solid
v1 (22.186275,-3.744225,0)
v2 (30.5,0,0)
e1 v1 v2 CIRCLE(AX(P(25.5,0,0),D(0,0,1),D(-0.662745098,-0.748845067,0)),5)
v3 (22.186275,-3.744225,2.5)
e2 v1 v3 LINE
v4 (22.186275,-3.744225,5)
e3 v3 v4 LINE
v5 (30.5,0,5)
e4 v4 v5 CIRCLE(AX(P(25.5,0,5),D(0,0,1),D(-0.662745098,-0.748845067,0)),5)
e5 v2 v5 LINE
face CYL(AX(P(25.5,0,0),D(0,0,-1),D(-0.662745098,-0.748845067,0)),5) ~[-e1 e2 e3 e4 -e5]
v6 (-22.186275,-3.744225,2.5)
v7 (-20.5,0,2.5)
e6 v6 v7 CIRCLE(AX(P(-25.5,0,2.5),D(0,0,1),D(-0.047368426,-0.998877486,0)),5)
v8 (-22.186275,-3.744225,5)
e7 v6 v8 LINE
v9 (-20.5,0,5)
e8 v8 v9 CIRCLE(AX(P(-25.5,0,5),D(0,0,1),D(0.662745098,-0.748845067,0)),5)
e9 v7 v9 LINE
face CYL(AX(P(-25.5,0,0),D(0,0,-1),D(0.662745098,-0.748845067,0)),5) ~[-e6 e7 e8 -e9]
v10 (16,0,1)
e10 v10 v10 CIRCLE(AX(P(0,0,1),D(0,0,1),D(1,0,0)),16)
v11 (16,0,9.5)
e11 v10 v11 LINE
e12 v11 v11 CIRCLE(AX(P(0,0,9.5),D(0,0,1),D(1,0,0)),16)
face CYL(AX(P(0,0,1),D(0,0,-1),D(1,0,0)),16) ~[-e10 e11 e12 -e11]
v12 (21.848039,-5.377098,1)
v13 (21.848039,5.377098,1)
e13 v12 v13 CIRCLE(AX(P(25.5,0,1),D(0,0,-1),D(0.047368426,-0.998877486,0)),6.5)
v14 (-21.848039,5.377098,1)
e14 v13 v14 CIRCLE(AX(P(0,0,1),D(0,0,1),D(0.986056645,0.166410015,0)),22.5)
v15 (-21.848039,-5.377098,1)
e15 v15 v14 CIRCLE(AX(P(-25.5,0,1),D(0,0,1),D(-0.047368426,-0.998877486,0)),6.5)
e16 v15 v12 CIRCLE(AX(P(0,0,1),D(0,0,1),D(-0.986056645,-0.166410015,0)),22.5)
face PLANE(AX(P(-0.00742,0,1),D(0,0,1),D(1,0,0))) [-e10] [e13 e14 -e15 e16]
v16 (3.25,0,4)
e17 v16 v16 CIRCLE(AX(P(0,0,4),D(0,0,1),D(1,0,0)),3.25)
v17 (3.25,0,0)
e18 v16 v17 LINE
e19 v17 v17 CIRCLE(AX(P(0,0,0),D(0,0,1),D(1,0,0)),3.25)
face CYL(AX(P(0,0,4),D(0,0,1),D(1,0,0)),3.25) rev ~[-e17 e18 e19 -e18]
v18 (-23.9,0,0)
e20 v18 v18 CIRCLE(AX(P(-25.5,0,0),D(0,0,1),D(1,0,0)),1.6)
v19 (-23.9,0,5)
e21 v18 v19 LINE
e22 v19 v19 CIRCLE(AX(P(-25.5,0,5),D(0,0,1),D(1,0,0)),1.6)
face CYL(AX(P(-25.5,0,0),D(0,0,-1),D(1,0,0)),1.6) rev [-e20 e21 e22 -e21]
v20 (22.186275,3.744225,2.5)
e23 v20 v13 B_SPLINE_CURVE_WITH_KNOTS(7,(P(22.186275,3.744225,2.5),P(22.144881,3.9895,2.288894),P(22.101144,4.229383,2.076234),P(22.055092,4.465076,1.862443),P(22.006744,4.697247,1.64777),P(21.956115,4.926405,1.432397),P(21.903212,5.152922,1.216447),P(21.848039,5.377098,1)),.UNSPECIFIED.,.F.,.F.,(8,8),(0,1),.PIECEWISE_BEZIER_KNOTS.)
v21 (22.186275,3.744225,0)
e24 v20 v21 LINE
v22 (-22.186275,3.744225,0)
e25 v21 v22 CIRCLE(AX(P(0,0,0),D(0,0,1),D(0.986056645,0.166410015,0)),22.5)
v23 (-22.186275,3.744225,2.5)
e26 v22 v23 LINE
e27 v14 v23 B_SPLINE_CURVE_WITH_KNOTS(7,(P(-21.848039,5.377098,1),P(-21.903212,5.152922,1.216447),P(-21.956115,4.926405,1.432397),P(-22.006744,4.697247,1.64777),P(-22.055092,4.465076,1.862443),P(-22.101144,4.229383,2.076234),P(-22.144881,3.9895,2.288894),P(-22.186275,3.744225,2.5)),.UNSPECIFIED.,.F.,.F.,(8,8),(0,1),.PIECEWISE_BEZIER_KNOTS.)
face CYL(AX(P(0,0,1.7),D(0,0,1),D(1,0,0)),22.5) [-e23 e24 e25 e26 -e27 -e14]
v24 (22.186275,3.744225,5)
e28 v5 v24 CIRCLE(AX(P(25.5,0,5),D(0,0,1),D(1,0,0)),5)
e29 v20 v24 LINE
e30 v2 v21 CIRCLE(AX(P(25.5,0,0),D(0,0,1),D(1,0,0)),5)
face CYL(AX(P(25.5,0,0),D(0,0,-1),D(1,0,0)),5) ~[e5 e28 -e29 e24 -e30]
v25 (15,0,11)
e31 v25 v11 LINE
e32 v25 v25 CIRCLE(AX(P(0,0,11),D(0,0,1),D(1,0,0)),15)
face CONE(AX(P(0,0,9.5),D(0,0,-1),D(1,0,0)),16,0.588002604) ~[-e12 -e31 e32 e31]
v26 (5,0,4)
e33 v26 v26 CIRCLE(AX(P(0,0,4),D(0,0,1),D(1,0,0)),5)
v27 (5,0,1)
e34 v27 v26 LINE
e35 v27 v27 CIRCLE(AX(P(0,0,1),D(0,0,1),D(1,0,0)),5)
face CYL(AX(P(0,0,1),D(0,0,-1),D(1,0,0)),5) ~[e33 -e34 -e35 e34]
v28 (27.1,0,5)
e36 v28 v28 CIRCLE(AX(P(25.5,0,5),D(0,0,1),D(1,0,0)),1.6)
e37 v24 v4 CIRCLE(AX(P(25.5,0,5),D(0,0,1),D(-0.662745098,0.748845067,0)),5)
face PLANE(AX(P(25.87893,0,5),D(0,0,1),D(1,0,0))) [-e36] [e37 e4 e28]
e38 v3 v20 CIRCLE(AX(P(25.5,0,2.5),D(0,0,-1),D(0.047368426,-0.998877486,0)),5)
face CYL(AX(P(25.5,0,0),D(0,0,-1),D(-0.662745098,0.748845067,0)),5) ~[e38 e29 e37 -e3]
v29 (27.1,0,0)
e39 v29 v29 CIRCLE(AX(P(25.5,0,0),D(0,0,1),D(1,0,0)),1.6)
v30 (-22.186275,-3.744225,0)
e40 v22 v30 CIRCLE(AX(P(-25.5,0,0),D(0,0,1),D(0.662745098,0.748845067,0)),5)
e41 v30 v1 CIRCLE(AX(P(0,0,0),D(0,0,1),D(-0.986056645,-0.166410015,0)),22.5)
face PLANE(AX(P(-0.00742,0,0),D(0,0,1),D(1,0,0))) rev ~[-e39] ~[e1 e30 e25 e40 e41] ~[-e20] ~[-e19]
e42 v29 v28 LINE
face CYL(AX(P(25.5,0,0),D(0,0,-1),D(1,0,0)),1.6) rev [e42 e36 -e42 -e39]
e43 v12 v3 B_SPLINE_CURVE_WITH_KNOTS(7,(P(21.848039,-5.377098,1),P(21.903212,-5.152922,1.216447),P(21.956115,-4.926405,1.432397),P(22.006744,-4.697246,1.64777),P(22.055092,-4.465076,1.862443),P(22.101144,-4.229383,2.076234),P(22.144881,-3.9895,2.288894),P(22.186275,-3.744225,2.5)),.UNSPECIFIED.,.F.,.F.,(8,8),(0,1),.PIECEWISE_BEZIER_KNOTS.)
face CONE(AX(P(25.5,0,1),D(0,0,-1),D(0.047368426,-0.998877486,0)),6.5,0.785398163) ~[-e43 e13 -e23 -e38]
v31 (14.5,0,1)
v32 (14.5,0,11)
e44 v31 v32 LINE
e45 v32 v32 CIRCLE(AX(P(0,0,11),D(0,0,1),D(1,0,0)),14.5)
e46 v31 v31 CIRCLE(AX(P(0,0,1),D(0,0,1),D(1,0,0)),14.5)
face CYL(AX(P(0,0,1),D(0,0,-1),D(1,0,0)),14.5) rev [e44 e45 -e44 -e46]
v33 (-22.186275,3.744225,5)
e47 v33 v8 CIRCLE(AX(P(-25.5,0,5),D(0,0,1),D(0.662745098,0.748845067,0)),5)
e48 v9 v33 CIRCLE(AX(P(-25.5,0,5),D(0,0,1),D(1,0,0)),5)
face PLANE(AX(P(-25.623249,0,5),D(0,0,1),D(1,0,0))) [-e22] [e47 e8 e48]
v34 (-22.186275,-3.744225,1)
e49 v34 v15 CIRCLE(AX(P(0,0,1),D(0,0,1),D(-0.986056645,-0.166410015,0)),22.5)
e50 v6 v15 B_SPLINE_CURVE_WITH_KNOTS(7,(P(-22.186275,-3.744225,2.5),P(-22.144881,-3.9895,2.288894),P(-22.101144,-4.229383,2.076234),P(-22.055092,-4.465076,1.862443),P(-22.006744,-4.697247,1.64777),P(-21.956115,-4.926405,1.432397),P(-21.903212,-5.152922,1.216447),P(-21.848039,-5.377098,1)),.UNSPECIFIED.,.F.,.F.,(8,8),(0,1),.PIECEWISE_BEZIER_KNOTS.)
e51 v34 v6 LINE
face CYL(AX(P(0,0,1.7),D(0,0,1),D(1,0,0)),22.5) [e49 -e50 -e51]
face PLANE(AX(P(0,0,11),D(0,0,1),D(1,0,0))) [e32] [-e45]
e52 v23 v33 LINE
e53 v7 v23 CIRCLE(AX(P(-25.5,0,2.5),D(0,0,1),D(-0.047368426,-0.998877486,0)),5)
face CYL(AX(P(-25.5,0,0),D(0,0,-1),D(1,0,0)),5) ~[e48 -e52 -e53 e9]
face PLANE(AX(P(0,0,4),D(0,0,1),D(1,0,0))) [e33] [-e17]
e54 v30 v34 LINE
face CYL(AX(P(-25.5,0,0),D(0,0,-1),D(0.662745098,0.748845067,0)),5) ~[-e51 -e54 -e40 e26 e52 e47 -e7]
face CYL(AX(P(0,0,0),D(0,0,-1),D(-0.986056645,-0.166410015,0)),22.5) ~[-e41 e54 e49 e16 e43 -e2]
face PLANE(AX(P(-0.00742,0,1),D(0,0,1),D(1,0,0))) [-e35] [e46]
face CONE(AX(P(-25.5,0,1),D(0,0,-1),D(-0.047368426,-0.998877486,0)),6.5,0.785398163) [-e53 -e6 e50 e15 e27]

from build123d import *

# Parameters (mm, degrees)
F0_R         = 1.6
F1_DEPTH     = 5
F2_DEPTH     = 1
F3_R         = 16
F3_R_2       = 14.5
F4_DEPTH     = 10
F5_SIZE2     = 1.5
F5_SIZE      = 1
F8_T4_ANGLE  = 185.4300536725
F8_S5_R      = 22.5
F8_T6_DEPTH  = 9
F8_T10_ANGLE = 185.4300536725
F8_S11_R     = 22.5
F8_T12_DEPTH = 9
F9_R         = 5
F10_DEPTH    = 3
F11_R        = 3.25
F12_DEPTH    = 5


# Not quite as in the source:
# - a fillet or chamfer that OpenCascade refuses, or shapes differently, is made with other operations: its cross-section is extruded or revolved along the edge and cut away or added
# - a feature of the source that left no trace in its solid (it failed there, or was rolled back) is left out


with BuildPart() as f1:
    # F0 (on Top) → F1 (new body)
    with BuildSketch(Plane.XY):
        with BuildLine():
            ThreePointArc((-22.1862745098, -3.7442253372), (-22.5, 0), (-22.1862745098, 3.7442253372))
            ThreePointArc((-22.1862745098, 3.7442253372), (-30.5, 0), (-22.1862745098, -3.7442253372))
        make_face()
        with Locations((-25.5, 0)):
            Circle(F0_R, mode=Mode.SUBTRACT)
        with BuildLine():
            ThreePointArc((-20.5, 0), (-20.9410183456, 2.0532136456), (-22.1862745098, 3.7442253372))
            ThreePointArc((-22.1862745098, 3.7442253372), (-22.5, 0), (-22.1862745098, -3.7442253372))
            ThreePointArc((-22.1862745098, -3.7442253372), (-20.9410183456, -2.0532136456), (-20.5, 0))
        make_face()
    extrude(amount=F1_DEPTH)



with BuildPart() as f1b:
    # F0 (on Top) → F1, piece 2 (new body)
    with BuildSketch(Plane.XY):
        with BuildLine():
            ThreePointArc((22.1862745098, 3.7442253372), (22.4214314493, 1.8786728733), (22.5, 0))
            ThreePointArc((22.5, 0), (22.4214314493, -1.8786728733), (22.1862745098, -3.7442253372))
            ThreePointArc((22.1862745098, -3.7442253372), (27.5532136456, -4.5589816544), (30.5, 0))
            ThreePointArc((30.5, 0), (27.5532136456, 4.5589816544), (22.1862745098, 3.7442253372))
        make_face()
        with Locations((25.5, 0)):
            Circle(F0_R, mode=Mode.SUBTRACT)
        with BuildLine():
            ThreePointArc((22.1862745098, -3.7442253372), (22.4214314493, -1.8786728733), (22.5, 0))
            ThreePointArc((22.5, 0), (22.4214314493, 1.8786728733), (22.1862745098, 3.7442253372))
            ThreePointArc((22.1862745098, 3.7442253372), (20.5, 0), (22.1862745098, -3.7442253372))
        make_face()
    extrude(amount=F1_DEPTH)


with BuildPart() as f1_1:
    add(f1.part)

    add(f1b.part)  # F2 merges F1b
    # F0 (on Top) → F2 (join)
    with BuildSketch(Plane.XY):
        with BuildLine():
            ThreePointArc((22.1862745098, -3.7442253372), (20.5, 0), (22.1862745098, 3.7442253372))
            ThreePointArc((22.1862745098, 3.7442253372), (0, 22.5), (-22.1862745098, 3.7442253372))
            ThreePointArc((-22.1862745098, 3.7442253372), (-20.9410183456, 2.0532136456), (-20.5, 0))
            ThreePointArc((-20.5, 0), (-20.9410183456, -2.0532136456), (-22.1862745098, -3.7442253372))
            ThreePointArc((-22.1862745098, -3.7442253372), (0, -22.5), (22.1862745098, -3.7442253372))
        make_face()
    extrude(amount=F2_DEPTH)

    # F3 (on face) → F4 (join)
    with BuildSketch(Plane.XY.offset(1)):
        Circle(F3_R)
        Circle(F3_R_2, mode=Mode.SUBTRACT)
    extrude(amount=F4_DEPTH)

    # F5
    f5_edges = [f1_1.edges().sort_by_distance(p)[0] for p in [
        (-16, 0, 11),
    ]]
    f5_side = f1_1.faces().sort_by_distance((-15.547452, 0, 11))[0]
    chamfer(f5_edges, length=F5_SIZE, length2=F5_SIZE2, reference=f5_side)

    # F8: chamfer of 1.5 on 2 edges, made by hand


with BuildPart() as f8_tool2:
    # F8_s3 → F8_t4 (revolve)
    with BuildSketch(Plane(origin=(25.4427839223, 1.2065389767, 0), x_dir=(0, 0, 1), z_dir=(0.9988774861, 0.0473684257, 0))):
        Polygon((1, 7.7078948555), (2.5, 6.2078948555), (1, 6.2078948555), align=None)
    revolve(axis=Axis((25.5, 0, 1), (0, 0, -1)), revolution_arc=F8_T4_ANGLE)

    # F8_s5 → F8_t6 (intersect, symmetric)
    with BuildSketch(Plane.XY.offset(1.8)):
        Circle(F8_S5_R)
    extrude(amount=F8_T6_DEPTH, both=True, mode=Mode.INTERSECT)


with BuildPart() as f1_2:
    add(f1_1.part)

    # F8_t1: union F8_tool2
    add(f8_tool2.part)


with BuildPart() as f8_tool8:
    # F8_s9 → F8_t10 (revolve)
    with BuildSketch(Plane(origin=(-25.4427839223, 1.2065389767, 0), x_dir=(0, 0, 1), z_dir=(-0.9988774861, 0.0473684257, 0))):
        Polygon((1, -7.7078948555), (2.5, -6.2078948555), (1, -6.2078948555), align=None)
    revolve(axis=Axis((-25.5, 0, 1), (0, 0, 1)), revolution_arc=F8_T10_ANGLE)

    # F8_s11 → F8_t12 (intersect, symmetric)
    with BuildSketch(Plane.XY.offset(1.7)):
        Circle(F8_S11_R)
    extrude(amount=F8_T12_DEPTH, both=True, mode=Mode.INTERSECT)


with BuildPart() as f1_3:
    add(f1_2.part)

    # F8_t7: union F8_tool8
    add(f8_tool8.part)

    # F9 (on face) → F10 (join)
    with BuildSketch(Plane.XY.offset(1)):
        Circle(F9_R)
    extrude(amount=F10_DEPTH)

    # F11 (on face) → F12 (cut)
    with BuildSketch(Plane.XY.offset(4)):
        Circle(F11_R)
    extrude(amount=-F12_DEPTH, mode=Mode.SUBTRACT)


solid = f1_3.part
